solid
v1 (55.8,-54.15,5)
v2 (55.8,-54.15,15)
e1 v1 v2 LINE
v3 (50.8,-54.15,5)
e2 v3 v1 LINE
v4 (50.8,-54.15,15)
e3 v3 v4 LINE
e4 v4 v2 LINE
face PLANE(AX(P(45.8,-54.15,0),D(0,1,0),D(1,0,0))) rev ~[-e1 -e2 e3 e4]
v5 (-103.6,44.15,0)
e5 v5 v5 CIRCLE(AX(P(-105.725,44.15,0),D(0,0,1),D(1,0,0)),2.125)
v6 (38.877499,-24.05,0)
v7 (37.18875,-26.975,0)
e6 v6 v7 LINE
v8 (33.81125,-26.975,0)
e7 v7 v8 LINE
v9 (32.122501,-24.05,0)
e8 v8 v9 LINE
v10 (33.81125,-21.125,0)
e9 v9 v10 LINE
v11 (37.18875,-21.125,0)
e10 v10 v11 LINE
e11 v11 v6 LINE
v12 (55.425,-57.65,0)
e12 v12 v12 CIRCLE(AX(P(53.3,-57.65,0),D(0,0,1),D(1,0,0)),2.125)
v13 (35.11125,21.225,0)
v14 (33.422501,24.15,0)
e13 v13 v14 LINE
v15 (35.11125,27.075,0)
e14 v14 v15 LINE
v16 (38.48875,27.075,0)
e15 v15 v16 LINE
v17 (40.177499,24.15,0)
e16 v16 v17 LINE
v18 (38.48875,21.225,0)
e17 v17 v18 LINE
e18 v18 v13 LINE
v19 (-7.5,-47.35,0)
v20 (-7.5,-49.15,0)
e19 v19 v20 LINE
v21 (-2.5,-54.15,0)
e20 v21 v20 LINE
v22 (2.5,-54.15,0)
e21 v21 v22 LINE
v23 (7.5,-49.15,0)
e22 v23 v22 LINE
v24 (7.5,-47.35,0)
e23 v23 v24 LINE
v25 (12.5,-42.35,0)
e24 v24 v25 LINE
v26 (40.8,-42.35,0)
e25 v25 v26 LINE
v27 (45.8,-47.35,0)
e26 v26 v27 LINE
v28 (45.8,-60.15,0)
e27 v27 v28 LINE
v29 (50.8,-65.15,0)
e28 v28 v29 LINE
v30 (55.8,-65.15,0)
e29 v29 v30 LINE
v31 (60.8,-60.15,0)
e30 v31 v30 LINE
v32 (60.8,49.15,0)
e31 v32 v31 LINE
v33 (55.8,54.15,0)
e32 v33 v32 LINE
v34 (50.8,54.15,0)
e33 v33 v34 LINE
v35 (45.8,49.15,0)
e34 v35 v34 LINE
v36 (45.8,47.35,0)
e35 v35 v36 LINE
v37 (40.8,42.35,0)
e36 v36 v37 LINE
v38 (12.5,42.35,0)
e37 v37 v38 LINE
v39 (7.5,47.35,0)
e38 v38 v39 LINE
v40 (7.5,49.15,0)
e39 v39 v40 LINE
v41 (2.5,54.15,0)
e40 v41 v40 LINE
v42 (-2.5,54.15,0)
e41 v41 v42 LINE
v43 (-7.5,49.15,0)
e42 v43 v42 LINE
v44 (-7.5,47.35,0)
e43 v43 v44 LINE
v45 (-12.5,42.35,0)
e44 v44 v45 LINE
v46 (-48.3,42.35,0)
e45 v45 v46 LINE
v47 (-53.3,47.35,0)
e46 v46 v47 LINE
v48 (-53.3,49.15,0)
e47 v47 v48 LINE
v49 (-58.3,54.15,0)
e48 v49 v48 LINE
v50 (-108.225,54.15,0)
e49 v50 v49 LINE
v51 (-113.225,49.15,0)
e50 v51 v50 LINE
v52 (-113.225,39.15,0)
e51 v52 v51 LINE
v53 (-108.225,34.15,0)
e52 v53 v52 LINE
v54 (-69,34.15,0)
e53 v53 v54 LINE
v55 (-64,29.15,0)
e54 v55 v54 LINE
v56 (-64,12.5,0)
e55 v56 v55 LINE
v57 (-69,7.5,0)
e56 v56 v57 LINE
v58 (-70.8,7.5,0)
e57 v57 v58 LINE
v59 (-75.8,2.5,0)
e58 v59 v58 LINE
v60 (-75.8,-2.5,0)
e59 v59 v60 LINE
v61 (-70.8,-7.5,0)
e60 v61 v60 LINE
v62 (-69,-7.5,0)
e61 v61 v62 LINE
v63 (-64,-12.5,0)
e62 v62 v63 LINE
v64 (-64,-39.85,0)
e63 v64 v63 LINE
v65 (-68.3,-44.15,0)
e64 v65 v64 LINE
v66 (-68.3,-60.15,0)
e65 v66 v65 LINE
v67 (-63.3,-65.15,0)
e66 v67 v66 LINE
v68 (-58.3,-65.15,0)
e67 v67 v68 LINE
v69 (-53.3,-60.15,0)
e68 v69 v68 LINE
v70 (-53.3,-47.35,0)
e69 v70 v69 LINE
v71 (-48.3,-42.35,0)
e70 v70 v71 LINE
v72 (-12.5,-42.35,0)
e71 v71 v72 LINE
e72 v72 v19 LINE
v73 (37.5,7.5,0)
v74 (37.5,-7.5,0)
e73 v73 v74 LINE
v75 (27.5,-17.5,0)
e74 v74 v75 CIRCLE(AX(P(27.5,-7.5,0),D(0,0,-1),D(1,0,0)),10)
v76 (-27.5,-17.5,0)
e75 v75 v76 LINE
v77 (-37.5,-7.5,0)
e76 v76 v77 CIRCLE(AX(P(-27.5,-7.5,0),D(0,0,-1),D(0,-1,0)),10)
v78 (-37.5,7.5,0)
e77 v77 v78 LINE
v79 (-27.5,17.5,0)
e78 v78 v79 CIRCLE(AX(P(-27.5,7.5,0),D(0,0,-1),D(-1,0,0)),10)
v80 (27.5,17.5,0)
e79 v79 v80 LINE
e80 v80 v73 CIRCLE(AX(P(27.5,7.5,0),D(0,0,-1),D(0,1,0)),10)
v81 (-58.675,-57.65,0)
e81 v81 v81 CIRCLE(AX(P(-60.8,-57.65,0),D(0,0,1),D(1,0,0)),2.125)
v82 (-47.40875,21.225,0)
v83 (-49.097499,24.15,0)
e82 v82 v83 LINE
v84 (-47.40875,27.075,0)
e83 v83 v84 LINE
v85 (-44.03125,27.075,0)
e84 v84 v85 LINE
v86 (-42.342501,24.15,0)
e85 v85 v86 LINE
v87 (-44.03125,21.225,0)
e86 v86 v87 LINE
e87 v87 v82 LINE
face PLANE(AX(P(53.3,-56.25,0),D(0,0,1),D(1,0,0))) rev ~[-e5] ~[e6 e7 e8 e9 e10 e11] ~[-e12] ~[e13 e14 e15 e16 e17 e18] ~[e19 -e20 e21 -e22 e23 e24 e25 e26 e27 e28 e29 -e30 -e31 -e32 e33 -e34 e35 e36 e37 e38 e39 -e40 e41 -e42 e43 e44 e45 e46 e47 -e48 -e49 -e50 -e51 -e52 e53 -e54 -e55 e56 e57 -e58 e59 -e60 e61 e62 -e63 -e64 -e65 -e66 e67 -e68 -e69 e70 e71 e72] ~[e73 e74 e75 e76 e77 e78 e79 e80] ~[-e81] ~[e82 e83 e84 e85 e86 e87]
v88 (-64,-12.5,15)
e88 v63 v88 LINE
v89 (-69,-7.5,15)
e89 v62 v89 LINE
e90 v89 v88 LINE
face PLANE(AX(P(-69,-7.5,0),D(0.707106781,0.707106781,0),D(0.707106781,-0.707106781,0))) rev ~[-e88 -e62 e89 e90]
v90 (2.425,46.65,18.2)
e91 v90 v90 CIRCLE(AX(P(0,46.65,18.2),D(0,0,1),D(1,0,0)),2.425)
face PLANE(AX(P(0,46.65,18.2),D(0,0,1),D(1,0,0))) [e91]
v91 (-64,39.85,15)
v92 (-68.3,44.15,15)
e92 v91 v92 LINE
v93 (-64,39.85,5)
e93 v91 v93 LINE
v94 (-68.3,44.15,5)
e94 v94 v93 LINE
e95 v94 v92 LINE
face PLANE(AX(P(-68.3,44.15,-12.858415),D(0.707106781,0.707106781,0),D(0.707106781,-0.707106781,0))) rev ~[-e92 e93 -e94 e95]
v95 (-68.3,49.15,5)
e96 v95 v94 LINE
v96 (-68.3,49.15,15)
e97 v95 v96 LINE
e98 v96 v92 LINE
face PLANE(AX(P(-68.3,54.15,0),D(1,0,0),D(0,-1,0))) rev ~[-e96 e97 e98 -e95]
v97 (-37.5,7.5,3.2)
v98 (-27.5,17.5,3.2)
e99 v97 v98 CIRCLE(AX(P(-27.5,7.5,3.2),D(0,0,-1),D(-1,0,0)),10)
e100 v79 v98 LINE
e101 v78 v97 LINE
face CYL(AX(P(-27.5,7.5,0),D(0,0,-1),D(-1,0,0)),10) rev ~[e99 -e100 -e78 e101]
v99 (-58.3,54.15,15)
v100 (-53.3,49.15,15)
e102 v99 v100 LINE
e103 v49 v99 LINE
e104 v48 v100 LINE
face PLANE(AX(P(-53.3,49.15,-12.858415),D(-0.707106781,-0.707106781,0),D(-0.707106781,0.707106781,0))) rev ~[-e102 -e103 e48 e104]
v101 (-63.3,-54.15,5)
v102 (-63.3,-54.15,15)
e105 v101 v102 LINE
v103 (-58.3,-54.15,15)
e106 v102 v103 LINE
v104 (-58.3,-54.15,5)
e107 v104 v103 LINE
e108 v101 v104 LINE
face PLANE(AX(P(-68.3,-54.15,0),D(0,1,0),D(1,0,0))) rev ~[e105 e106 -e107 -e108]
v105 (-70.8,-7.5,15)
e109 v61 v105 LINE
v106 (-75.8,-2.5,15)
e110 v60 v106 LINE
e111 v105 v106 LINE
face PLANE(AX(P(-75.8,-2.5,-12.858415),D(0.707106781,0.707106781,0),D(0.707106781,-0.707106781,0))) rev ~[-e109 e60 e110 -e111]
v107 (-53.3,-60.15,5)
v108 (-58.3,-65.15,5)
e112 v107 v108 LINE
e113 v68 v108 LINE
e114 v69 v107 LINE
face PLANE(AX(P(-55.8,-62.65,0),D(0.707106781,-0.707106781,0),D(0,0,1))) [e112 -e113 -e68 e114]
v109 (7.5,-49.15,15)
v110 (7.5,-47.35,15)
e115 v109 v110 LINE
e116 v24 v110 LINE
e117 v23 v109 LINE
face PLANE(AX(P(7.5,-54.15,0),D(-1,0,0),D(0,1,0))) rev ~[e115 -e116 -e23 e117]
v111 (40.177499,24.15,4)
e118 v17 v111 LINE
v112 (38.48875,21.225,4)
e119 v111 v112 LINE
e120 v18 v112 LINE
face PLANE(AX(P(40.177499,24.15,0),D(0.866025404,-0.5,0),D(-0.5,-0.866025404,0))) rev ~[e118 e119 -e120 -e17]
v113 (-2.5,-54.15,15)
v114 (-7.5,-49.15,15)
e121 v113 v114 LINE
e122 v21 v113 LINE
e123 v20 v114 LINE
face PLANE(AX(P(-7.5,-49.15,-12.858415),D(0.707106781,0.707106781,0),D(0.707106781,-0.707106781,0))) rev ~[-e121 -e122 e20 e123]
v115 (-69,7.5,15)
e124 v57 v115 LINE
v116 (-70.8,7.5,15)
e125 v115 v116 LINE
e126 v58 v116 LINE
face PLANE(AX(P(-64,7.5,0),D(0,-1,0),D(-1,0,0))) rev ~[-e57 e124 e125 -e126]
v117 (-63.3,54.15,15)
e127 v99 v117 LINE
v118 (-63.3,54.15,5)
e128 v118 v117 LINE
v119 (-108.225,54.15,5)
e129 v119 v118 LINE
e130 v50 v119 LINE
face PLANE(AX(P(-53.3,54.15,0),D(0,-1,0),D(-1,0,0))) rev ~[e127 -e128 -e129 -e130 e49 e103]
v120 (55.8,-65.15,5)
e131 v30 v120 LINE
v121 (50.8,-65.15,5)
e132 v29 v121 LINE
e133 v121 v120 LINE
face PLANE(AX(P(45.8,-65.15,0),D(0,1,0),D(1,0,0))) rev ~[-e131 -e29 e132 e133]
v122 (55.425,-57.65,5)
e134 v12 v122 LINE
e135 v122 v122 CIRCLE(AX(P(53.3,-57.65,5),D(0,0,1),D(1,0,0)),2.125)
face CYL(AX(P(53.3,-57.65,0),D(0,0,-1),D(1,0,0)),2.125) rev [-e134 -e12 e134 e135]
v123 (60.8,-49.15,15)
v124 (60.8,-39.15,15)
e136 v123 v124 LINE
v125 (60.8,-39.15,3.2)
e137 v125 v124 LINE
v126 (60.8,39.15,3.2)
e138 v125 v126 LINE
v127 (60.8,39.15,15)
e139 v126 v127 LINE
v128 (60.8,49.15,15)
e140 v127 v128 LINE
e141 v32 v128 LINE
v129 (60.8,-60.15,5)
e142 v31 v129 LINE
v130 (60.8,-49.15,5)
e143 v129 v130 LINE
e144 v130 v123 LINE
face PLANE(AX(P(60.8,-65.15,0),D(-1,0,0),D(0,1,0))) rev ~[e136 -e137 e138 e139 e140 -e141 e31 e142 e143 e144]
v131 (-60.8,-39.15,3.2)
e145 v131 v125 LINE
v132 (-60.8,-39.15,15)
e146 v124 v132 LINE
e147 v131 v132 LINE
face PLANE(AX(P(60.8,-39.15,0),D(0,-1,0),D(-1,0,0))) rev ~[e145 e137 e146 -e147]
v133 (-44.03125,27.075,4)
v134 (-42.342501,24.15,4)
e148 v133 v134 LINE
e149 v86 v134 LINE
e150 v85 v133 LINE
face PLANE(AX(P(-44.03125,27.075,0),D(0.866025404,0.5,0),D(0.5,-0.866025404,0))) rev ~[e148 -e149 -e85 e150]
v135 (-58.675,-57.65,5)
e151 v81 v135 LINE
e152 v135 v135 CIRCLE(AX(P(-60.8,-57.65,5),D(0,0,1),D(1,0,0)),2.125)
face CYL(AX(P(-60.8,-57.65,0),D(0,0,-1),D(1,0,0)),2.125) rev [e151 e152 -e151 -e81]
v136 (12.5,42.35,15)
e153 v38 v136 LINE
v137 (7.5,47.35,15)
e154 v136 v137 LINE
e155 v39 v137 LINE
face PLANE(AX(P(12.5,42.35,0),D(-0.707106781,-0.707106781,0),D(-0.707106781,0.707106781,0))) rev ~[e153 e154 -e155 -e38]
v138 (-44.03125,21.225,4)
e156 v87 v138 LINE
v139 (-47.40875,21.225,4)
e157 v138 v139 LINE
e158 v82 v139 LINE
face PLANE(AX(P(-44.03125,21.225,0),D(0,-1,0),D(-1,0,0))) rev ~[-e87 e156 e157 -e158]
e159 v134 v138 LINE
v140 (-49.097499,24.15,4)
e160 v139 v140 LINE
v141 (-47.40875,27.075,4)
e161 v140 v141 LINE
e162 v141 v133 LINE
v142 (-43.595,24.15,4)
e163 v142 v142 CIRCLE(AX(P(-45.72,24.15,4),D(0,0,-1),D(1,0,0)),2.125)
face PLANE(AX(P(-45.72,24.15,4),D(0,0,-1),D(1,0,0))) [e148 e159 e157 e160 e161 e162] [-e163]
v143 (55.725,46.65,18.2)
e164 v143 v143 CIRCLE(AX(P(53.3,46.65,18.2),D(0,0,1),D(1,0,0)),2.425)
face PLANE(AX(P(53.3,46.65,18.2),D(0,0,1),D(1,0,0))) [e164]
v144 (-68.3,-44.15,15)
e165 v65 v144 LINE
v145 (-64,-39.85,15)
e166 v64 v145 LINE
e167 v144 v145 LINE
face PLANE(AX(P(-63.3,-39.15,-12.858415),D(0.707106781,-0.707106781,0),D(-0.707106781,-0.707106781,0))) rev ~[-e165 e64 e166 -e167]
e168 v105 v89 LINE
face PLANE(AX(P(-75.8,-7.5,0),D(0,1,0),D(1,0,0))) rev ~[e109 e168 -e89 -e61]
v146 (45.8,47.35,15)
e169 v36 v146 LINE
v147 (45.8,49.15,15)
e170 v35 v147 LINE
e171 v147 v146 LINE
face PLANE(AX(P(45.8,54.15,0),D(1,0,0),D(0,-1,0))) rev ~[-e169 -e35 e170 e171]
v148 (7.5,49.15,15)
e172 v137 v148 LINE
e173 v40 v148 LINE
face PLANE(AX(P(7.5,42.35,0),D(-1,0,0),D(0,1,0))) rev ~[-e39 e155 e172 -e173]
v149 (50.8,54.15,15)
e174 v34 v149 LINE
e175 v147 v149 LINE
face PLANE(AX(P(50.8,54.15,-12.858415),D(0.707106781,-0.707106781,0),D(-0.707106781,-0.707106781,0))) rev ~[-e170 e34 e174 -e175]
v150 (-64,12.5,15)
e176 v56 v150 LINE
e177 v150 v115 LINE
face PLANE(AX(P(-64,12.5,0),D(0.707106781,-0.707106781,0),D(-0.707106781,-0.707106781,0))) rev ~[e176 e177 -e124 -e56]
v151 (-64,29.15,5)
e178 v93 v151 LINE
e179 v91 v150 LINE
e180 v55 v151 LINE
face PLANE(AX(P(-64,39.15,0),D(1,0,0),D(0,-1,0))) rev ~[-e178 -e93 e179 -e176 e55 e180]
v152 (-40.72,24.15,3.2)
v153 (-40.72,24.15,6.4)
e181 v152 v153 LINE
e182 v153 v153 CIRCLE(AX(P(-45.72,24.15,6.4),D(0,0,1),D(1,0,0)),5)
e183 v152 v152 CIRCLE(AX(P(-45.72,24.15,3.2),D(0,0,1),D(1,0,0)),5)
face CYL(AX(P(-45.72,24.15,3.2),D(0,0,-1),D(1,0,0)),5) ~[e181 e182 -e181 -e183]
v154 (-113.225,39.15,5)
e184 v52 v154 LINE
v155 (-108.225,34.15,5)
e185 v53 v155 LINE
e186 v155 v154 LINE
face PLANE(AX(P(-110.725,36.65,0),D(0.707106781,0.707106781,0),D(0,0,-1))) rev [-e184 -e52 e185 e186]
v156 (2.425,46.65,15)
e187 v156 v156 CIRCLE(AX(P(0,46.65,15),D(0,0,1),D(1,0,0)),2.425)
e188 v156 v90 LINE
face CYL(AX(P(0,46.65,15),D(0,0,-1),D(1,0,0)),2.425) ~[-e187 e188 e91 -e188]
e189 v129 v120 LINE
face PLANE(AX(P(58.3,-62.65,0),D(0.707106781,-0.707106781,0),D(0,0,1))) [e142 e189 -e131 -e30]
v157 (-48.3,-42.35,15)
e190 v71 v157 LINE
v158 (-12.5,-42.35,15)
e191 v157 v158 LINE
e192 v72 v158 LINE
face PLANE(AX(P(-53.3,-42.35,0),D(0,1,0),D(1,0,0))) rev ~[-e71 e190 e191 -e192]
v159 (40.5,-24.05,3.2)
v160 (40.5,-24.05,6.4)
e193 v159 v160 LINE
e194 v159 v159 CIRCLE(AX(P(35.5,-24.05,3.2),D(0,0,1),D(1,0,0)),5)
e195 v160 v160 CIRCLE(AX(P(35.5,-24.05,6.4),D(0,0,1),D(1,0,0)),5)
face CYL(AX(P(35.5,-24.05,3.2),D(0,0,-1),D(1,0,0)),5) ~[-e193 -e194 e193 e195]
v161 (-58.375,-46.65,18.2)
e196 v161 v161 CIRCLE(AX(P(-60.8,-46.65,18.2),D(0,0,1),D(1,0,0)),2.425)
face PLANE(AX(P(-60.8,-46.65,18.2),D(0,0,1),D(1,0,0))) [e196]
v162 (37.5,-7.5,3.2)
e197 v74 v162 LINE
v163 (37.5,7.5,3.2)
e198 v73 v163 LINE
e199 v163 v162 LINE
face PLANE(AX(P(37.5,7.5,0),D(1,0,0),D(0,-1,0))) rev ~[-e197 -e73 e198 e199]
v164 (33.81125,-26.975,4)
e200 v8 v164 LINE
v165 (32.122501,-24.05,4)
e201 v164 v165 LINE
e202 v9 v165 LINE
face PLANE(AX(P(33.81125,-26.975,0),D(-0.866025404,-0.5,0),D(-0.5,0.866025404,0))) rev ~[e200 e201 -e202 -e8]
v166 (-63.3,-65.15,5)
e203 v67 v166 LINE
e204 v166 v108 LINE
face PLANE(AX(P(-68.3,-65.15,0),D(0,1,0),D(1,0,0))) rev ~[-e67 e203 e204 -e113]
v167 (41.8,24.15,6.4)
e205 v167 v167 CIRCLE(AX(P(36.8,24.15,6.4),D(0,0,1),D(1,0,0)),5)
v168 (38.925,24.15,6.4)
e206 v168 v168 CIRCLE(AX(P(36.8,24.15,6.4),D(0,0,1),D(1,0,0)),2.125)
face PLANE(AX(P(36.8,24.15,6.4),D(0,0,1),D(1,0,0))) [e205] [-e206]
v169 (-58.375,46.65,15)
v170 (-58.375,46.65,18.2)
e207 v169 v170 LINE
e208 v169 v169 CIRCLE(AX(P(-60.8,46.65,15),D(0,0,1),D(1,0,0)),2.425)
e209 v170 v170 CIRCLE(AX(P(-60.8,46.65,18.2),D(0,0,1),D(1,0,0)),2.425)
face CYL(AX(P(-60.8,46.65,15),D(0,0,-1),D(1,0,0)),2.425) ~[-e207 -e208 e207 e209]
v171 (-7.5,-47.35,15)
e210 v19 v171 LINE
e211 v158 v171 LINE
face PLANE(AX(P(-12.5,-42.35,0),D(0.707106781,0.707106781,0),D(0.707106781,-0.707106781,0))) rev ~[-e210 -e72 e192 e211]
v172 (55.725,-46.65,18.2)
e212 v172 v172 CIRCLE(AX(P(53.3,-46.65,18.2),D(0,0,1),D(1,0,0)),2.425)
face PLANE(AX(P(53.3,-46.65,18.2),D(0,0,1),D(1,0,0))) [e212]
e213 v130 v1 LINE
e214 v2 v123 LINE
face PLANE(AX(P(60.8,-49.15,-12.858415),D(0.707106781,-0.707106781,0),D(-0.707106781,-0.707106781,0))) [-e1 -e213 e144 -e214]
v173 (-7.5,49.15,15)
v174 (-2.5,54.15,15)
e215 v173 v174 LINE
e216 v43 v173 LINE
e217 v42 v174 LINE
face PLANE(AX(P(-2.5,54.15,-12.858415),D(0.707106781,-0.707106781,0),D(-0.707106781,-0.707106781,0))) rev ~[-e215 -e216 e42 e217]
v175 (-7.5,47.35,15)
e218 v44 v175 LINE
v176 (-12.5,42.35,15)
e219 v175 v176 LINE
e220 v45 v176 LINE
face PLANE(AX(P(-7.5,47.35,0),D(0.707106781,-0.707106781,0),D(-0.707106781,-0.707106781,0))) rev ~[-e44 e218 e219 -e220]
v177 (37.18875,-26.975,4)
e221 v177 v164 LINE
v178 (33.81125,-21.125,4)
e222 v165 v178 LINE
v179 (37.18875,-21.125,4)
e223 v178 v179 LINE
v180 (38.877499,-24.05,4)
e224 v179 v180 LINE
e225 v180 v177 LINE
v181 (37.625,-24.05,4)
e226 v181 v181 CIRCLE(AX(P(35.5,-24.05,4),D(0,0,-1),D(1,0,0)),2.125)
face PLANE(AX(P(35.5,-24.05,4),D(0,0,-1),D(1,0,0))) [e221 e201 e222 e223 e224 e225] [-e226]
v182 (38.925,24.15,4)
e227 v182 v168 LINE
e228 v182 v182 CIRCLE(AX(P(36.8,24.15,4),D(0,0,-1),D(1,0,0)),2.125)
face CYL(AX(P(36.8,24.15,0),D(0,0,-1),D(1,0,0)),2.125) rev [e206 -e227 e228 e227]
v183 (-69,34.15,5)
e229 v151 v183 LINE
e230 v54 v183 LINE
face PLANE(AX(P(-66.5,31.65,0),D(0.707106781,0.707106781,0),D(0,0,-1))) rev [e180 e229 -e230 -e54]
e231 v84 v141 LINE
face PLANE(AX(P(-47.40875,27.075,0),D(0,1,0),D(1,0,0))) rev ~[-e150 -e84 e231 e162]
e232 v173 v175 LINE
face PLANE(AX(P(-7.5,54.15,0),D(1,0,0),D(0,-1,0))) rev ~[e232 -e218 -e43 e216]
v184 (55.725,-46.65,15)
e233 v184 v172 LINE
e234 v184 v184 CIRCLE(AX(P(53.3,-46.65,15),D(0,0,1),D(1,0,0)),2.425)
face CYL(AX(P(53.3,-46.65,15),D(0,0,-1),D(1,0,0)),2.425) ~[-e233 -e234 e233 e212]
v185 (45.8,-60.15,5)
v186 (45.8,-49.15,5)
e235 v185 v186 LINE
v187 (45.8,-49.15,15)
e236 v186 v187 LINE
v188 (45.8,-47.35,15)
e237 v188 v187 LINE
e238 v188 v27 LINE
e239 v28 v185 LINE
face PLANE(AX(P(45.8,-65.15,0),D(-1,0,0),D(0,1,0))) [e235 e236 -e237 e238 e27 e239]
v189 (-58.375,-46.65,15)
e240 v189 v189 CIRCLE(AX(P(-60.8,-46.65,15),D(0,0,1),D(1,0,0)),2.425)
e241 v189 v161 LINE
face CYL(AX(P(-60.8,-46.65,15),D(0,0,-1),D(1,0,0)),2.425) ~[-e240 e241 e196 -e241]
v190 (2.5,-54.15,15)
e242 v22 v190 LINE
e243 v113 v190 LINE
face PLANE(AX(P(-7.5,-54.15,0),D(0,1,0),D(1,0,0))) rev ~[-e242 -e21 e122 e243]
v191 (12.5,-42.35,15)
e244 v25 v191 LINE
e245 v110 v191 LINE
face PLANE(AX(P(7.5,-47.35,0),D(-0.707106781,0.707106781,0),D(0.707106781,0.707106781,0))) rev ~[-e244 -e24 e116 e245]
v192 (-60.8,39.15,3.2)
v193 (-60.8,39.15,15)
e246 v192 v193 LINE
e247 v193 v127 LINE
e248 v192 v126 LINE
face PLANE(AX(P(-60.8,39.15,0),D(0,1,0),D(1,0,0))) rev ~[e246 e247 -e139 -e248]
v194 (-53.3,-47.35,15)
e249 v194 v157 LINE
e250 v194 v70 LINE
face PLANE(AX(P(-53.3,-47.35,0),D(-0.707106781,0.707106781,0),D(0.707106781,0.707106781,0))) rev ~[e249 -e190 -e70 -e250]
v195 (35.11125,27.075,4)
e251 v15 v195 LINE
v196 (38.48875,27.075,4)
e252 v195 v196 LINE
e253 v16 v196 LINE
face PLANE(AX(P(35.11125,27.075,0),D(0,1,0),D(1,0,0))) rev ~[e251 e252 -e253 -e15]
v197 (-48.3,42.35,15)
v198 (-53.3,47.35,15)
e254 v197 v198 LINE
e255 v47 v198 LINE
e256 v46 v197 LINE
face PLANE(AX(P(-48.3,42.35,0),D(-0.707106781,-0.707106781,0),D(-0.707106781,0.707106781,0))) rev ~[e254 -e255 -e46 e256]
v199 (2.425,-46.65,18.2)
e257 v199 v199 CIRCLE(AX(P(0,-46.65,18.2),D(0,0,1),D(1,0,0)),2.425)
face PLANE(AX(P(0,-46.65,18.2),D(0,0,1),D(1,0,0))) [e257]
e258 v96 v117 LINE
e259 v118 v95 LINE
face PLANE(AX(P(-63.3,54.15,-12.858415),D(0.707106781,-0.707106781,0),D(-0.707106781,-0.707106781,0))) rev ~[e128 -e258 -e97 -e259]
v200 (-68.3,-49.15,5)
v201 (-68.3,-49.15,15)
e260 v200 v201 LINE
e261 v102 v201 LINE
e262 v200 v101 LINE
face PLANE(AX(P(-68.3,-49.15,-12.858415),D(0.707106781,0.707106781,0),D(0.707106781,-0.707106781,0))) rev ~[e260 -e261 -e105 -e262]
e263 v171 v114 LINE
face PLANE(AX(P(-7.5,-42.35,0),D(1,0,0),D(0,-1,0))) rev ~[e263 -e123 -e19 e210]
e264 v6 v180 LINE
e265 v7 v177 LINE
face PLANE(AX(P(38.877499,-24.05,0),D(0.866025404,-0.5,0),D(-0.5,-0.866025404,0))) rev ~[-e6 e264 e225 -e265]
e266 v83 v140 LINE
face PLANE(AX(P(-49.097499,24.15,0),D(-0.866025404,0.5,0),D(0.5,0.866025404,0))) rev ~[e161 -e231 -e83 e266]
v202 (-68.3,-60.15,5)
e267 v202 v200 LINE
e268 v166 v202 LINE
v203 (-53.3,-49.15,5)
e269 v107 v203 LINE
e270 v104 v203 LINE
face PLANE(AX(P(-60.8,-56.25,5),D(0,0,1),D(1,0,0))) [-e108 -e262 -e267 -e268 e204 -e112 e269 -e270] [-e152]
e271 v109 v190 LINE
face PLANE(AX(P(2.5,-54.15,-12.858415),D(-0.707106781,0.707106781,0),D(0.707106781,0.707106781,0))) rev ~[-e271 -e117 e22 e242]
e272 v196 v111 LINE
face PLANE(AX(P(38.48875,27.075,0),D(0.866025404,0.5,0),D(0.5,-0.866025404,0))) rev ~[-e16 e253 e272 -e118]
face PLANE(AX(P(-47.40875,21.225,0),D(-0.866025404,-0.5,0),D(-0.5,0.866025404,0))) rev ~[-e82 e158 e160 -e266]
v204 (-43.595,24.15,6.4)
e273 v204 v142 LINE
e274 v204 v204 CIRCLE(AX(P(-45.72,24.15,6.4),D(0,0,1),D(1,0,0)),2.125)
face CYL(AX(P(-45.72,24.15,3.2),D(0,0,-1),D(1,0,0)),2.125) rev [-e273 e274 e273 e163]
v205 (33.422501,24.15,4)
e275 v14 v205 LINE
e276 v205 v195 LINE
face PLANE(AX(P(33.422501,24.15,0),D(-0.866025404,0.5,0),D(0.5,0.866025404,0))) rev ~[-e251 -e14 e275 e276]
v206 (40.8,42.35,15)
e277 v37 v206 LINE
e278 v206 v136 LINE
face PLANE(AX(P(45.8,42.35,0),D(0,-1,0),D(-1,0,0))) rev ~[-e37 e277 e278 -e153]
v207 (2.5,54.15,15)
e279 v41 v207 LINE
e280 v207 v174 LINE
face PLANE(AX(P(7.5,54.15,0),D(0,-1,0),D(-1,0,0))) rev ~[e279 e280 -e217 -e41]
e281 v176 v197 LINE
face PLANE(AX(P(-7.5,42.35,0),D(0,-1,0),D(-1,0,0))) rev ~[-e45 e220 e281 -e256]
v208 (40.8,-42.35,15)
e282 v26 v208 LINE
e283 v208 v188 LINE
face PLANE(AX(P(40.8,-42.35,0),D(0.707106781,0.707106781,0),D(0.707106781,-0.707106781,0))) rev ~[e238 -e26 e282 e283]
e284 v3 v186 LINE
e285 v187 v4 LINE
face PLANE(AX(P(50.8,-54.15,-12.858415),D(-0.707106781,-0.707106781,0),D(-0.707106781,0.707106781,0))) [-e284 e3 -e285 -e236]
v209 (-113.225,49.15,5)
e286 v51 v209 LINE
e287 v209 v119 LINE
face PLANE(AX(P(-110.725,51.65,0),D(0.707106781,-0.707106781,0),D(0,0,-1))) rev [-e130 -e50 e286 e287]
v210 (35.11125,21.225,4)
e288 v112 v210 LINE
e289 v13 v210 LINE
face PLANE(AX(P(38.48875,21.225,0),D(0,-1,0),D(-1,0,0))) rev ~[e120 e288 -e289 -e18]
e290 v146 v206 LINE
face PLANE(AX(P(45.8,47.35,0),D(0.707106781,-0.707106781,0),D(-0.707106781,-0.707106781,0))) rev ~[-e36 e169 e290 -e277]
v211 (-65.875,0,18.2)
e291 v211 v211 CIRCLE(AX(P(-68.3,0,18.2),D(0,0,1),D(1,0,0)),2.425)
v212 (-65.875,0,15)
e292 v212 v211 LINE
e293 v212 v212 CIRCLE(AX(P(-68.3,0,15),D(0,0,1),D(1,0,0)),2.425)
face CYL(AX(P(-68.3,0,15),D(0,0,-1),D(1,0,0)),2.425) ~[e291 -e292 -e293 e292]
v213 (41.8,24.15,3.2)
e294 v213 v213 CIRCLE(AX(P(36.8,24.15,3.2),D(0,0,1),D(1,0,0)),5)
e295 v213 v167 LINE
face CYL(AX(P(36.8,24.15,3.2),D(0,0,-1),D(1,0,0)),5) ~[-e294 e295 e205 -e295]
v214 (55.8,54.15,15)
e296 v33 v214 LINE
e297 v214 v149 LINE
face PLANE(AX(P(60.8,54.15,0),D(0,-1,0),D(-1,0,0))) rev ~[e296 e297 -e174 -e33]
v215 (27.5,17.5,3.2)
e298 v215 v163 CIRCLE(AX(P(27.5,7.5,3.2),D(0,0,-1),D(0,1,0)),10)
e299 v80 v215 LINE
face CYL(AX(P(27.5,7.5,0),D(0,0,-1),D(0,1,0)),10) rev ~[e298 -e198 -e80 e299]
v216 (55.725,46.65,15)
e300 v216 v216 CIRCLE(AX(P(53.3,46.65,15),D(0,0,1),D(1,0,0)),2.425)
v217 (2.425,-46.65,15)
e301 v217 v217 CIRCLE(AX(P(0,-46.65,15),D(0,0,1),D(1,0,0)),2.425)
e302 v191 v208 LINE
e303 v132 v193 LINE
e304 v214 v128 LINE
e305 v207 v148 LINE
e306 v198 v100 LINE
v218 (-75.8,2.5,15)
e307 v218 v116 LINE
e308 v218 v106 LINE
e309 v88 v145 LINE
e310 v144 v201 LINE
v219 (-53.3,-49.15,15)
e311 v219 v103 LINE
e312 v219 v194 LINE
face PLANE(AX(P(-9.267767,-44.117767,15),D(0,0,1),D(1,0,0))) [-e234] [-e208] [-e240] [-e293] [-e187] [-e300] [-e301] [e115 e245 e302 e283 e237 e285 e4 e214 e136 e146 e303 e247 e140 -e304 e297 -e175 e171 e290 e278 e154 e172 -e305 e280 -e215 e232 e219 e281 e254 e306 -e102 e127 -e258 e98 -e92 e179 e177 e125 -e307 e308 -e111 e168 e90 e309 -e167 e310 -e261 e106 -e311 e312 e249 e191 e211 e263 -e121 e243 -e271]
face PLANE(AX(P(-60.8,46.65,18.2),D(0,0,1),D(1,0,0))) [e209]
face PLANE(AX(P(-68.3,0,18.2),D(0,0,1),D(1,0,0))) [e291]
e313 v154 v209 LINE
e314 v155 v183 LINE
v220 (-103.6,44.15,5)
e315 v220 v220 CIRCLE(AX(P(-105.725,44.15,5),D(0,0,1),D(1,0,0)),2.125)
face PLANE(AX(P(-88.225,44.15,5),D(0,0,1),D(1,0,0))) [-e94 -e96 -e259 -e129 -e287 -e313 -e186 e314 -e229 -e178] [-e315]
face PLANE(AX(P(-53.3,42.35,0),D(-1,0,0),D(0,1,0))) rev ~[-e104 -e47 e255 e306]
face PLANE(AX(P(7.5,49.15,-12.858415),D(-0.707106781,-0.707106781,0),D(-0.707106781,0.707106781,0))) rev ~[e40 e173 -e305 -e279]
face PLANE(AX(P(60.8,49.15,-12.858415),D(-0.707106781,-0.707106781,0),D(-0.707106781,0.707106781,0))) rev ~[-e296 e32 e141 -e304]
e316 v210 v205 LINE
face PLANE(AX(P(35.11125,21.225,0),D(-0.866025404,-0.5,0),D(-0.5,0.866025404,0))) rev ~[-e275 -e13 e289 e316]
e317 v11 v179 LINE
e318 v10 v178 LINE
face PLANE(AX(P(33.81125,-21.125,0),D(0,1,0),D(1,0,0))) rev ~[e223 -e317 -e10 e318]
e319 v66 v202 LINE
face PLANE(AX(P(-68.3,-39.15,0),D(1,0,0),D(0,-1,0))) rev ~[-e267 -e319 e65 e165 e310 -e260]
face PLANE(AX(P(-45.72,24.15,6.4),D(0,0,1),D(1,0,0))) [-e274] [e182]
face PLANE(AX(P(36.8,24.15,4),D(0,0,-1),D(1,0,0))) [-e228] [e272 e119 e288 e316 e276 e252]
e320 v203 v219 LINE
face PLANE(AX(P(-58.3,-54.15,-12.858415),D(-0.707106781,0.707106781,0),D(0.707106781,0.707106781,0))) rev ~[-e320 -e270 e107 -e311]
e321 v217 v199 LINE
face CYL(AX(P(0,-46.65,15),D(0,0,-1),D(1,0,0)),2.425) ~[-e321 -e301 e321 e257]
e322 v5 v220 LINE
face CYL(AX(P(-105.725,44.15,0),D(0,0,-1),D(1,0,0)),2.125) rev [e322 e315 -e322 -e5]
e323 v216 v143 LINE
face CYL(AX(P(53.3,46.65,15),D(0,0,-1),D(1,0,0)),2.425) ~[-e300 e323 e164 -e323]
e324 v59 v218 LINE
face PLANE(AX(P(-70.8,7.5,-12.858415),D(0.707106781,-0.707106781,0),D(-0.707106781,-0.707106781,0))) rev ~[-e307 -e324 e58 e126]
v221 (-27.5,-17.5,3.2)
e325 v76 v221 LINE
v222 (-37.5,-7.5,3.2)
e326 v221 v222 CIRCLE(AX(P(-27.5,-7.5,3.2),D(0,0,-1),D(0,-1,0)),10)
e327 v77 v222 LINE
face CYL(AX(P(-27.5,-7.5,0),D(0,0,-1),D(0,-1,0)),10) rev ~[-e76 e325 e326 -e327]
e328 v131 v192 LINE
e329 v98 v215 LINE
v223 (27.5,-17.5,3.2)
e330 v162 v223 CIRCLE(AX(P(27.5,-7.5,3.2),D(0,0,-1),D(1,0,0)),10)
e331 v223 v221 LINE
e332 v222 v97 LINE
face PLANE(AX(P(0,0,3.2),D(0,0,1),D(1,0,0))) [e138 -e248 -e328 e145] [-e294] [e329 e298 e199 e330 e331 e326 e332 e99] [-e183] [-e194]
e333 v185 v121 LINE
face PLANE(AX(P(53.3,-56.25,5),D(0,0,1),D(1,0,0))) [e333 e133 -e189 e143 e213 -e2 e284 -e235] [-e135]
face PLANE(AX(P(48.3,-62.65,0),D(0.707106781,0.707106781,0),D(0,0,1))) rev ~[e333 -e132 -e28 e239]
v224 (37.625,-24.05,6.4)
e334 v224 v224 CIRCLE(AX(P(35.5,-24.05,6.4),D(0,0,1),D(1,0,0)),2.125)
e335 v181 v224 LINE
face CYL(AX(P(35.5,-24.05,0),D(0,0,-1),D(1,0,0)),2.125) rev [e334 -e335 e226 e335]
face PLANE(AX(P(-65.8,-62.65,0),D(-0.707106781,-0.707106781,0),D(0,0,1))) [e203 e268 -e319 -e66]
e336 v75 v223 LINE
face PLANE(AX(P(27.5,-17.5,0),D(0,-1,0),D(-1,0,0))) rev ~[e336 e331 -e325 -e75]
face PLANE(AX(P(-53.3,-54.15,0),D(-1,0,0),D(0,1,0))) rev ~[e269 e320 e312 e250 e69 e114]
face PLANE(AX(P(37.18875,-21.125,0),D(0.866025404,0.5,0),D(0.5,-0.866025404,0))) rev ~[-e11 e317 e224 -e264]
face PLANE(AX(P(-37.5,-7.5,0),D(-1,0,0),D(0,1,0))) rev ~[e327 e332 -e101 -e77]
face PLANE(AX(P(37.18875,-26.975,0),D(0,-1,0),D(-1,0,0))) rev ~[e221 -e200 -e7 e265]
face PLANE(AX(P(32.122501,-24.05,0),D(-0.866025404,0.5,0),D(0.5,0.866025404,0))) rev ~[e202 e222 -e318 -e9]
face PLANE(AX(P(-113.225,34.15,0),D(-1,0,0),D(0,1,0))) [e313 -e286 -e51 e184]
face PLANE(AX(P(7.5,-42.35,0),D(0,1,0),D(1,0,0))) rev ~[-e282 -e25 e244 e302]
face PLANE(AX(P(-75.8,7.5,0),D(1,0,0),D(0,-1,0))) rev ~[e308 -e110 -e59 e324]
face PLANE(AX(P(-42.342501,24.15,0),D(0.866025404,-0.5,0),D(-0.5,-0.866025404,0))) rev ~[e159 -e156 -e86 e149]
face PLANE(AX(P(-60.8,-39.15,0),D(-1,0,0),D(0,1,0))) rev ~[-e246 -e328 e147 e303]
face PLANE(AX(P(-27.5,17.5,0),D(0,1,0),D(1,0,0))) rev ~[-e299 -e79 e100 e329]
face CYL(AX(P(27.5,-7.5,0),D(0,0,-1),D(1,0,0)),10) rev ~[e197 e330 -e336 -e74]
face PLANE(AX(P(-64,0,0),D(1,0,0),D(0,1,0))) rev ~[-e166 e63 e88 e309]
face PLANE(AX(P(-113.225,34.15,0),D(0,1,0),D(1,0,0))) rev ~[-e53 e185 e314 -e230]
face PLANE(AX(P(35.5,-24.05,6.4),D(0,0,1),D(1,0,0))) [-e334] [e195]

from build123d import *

# Parameters (mm, degrees)
F0_W          = 121.6
F0_H          = 78.3
F0_R          = 2.125
F1_DEPTH      = 3.2
F2_R          = 5
F2_R_2        = 2.125
F3_DEPTH      = 3.2
F5_DEPTH      = 4
F7_DEPTH      = 15
F8_R          = 2.425
F9_DEPTH      = 3.2
F10_T1_DEPTH  = 15
F10_T3_DEPTH  = 40.7168298797
F10_T8_DEPTH  = 40.7168298797
F10_T13_DEPTH = 40.7168298797
F11_W         = 15
F11_H         = 17.8
F11_R         = 2.125
F11_W_2       = 50
F11_H_2       = 20
F12_DEPTH     = 5
F13_SIZE      = 5


# Not quite as in the source:
# - a fillet or chamfer that OpenCascade refuses, or shapes differently, is made with other operations: its cross-section is extruded or revolved along the edge and cut away or added
# - a feature names something its author has since deleted; it is built from what else it names


with BuildPart() as f1:
    # F0 (on Top) → F1 (new body)
    with BuildSketch(Plane.XY):
        Rectangle(F0_W, F0_H)
        with Locations((35.5, -24.05)):
            Circle(F0_R, mode=Mode.SUBTRACT)
        with BuildLine():
            ThreePointArc((37.5, -7.5), (34.5710678119, -14.5710678119), (27.5, -17.5))
            Line((27.5, -17.5), (-27.5, -17.5))
            ThreePointArc((-27.5, -17.5), (-34.5710678119, -14.5710678119), (-37.5, -7.5))
            Line((-37.5, -7.5), (-37.5, 7.5))
            ThreePointArc((-37.5, 7.5), (-34.5710678119, 14.5710678119), (-27.5, 17.5))
            Line((-27.5, 17.5), (27.5, 17.5))
            ThreePointArc((27.5, 17.5), (34.5710678119, 14.5710678119), (37.5, 7.5))
            Line((37.5, 7.5), (37.5, -7.5))
        make_face(mode=Mode.SUBTRACT)
        with Locations((-45.72, 24.15)):
            Circle(F0_R, mode=Mode.SUBTRACT)
        with Locations((36.8, 24.15)):
            Circle(F0_R, mode=Mode.SUBTRACT)
    extrude(amount=F1_DEPTH)

    # F2 (on face) → F3 (join)
    with BuildSketch(Plane.XY.offset(3.2)):
        with Locations((-45.72, 24.15)):
            Circle(F2_R)
        with Locations((-45.72, 24.15)):
            Circle(F2_R_2, mode=Mode.SUBTRACT)
        with Locations((36.8, 24.15)):
            Circle(F2_R)
        with Locations((36.8, 24.15)):
            Circle(F2_R_2, mode=Mode.SUBTRACT)
        with Locations((35.5, -24.05)):
            Circle(F2_R)
        with Locations((35.5, -24.05)):
            Circle(F2_R_2, mode=Mode.SUBTRACT)
    extrude(amount=F3_DEPTH)

    # F4 (on face) → F5 (cut)
    with BuildSketch(Plane(origin=(0, 0, 0), x_dir=(1, 0, 0), z_dir=(0, 0, -1))):
        Polygon((-44.0312504626, -21.225), (-47.4087495374, -21.225), (-49.0974990748, -24.15), (-47.4087495374, -27.075), (-44.0312504626, -27.075), (-42.3425009252, -24.15), align=None)
        Polygon((38.4887495374, -21.225), (35.1112504626, -21.225), (33.4225009252, -24.15), (35.1112504626, -27.075), (38.4887495374, -27.075), (40.1774990748, -24.15), align=None)
        Polygon((33.8112504626, 21.125), (37.1887495374, 21.125), (38.8774990748, 24.05), (37.1887495374, 26.975), (33.8112504626, 26.975), (32.1225009252, 24.05), align=None)
    extrude(amount=-F5_DEPTH, mode=Mode.SUBTRACT)

    # F6 (on Top) → F7 (join)
    with BuildSketch(Plane.XY):
        Polygon((-60.8, 39.15), (60.8, 39.15), (60.8, 54.15), (45.8, 54.15), (45.8, 42.35), (7.5, 42.35), (7.5, 54.15), (-7.5, 54.15), (-7.5, 42.35), (-53.3, 42.35), (-53.3, 54.15), (-68.3, 54.15), (-68.3, 39.15), (-64, 39.15), (-64, 7.5), (-75.8, 7.5), (-75.8, -7.5), (-64, -7.5), (-64, -39.15), (-68.3, -39.15), (-68.3, -54.15), (-53.3, -54.15), (-53.3, -42.35), (-7.5, -42.35), (-7.5, -54.15), (7.5, -54.15), (7.5, -42.35), (45.8, -42.35), (45.8, -54.15), (60.8, -54.15), (60.8, -39.15), (-60.8, -39.15), align=None)
    extrude(amount=F7_DEPTH)

    # F8 (on face) → F9 (join)
    with BuildSketch(Plane.XY.offset(15)):
        with Locations((53.3, 46.65)):
            Circle(F8_R)
        with Locations((0, 46.65)):
            Circle(F8_R)
        with Locations((-60.8, 46.65)):
            Circle(F8_R)
        with Locations((-68.3, 0)):
            Circle(F8_R)
        with Locations((-60.8, -46.65)):
            Circle(F8_R)
        with Locations((0, -46.65)):
            Circle(F8_R)
        with Locations((53.3, -46.65)):
            Circle(F8_R)
    extrude(amount=F9_DEPTH)

    # F10: chamfer of 5 on 26 edges, made by hand

    # F10_s2 → F10_t1 (join)
    with BuildSketch(Plane.XY):
        Polygon((-12.5, -42.35), (-7.5, -47.35), (-7.5, -42.35), align=None)
        Polygon((7.5, -47.35), (12.5, -42.35), (7.5, -42.35), align=None)
        Polygon((40.8, -42.35), (45.8, -47.35), (45.8, -42.35), align=None)
        Polygon((-53.3, -47.35), (-48.3, -42.35), (-53.3, -42.35), align=None)
        Polygon((-69, -7.5), (-64, -12.5), (-64, -7.5), align=None)
        Polygon((-64, 12.5), (-69, 7.5), (-64, 7.5), align=None)
        Polygon((-48.3, 42.35), (-53.3, 47.35), (-53.3, 42.35), align=None)
        Polygon((-7.5, 47.35), (-12.5, 42.35), (-7.5, 42.35), align=None)
        Polygon((45.8, 47.35), (40.8, 42.35), (45.8, 42.35), align=None)
        Polygon((12.5, 42.35), (7.5, 47.35), (7.5, 42.35), align=None)
    extrude(amount=F10_T1_DEPTH)

    # F10_s4 → F10_t3 (cut)
    with BuildSketch(Plane.XY.offset(-12.8584149398)):
        Polygon((-75.8, -2.5), (-70.8, -7.5), (-75.8, -7.5), align=None)
        Polygon((-70.8, 7.5), (-75.8, 2.5), (-75.8, 7.5), align=None)
        Polygon((-63.3, 54.15), (-68.3, 49.15), (-68.3, 54.15), align=None)
        Polygon((-53.3, 49.15), (-58.3, 54.15), (-53.3, 54.15), align=None)
        Polygon((-2.5, 54.15), (-7.5, 49.15), (-7.5, 54.15), align=None)
        Polygon((7.5, 49.15), (2.5, 54.15), (7.5, 54.15), align=None)
        Polygon((50.8, 54.15), (45.8, 49.15), (45.8, 54.15), align=None)
        Polygon((60.8, 49.15), (55.8, 54.15), (60.8, 54.15), align=None)
        Polygon((60.8, -49.15), (55.8, -54.15), (60.8, -54.15), align=None)
        Polygon((50.8, -54.15), (45.8, -49.15), (45.8, -54.15), align=None)
        Polygon((2.5, -54.15), (7.5, -49.15), (7.5, -54.15), align=None)
        Polygon((-7.5, -49.15), (-2.5, -54.15), (-7.5, -54.15), align=None)
        Polygon((-58.3, -54.15), (-53.3, -49.15), (-53.3, -54.15), align=None)
        Polygon((-68.3, -49.15), (-63.3, -54.15), (-68.3, -54.15), align=None)
    extrude(amount=F10_T3_DEPTH, mode=Mode.SUBTRACT)


with BuildPart() as f10_tool6:
    # F10_s7 → F10_t8 (new body)
    with BuildSketch(Plane.XY.offset(-12.8584149398)):
        Polygon((-68.3, 44.15), (-63.3, 39.15), (-68.3, 39.15), align=None)
    extrude(amount=F10_T8_DEPTH)

    split(bisect_by=Plane.YZ.offset(-64), keep=Keep.BOTTOM)


with BuildPart() as f1_1:
    add(f1.part)

    # F10_t5: cut F10_tool6
    add(f10_tool6.part, mode=Mode.SUBTRACT)


with BuildPart() as f10_tool11:
    # F10_s12 → F10_t13 (new body)
    with BuildSketch(Plane.XY.offset(-12.8584149398)):
        Polygon((-63.3, -39.15), (-68.3, -44.15), (-68.3, -39.15), align=None)
    extrude(amount=F10_T13_DEPTH)

    split(bisect_by=Plane.YZ.offset(-64), keep=Keep.BOTTOM)


with BuildPart() as f1_2:
    add(f1_1.part)

    # F10_t10: cut F10_tool11
    add(f10_tool11.part, mode=Mode.SUBTRACT)

    # F11 (on Top) → F12 (join)
    with BuildSketch(Plane.XY):
        with Locations((53.3, -56.25)):
            Rectangle(F11_W, F11_H)
        with Locations((53.3, -57.65)):
            Circle(F11_R, mode=Mode.SUBTRACT)
        with Locations((-60.8, -56.25)):
            Rectangle(F11_W, F11_H)
        with Locations((-60.8, -57.65)):
            Circle(F11_R, mode=Mode.SUBTRACT)
        with Locations((-88.225, 44.15)):
            Rectangle(F11_W_2, F11_H_2)
        with Locations((-105.725, 44.15)):
            Circle(F11_R, mode=Mode.SUBTRACT)
    extrude(amount=F12_DEPTH)

    # F13
    f13_edges = [f1_2.edges().sort_by_distance(p)[0] for p in [
        (-68.3, -65.15, 2.5),
        (-53.3, -65.15, 2.5),
        (45.8, -65.15, 2.5),
        (60.8, -65.15, 2.5),
        (-113.225, 54.15, 2.5),
        (-113.225, 34.15, 2.5),
        (-64, 34.15, 2.5),
    ]]
    chamfer(f13_edges, length=F13_SIZE)


solid = f1_2.part
